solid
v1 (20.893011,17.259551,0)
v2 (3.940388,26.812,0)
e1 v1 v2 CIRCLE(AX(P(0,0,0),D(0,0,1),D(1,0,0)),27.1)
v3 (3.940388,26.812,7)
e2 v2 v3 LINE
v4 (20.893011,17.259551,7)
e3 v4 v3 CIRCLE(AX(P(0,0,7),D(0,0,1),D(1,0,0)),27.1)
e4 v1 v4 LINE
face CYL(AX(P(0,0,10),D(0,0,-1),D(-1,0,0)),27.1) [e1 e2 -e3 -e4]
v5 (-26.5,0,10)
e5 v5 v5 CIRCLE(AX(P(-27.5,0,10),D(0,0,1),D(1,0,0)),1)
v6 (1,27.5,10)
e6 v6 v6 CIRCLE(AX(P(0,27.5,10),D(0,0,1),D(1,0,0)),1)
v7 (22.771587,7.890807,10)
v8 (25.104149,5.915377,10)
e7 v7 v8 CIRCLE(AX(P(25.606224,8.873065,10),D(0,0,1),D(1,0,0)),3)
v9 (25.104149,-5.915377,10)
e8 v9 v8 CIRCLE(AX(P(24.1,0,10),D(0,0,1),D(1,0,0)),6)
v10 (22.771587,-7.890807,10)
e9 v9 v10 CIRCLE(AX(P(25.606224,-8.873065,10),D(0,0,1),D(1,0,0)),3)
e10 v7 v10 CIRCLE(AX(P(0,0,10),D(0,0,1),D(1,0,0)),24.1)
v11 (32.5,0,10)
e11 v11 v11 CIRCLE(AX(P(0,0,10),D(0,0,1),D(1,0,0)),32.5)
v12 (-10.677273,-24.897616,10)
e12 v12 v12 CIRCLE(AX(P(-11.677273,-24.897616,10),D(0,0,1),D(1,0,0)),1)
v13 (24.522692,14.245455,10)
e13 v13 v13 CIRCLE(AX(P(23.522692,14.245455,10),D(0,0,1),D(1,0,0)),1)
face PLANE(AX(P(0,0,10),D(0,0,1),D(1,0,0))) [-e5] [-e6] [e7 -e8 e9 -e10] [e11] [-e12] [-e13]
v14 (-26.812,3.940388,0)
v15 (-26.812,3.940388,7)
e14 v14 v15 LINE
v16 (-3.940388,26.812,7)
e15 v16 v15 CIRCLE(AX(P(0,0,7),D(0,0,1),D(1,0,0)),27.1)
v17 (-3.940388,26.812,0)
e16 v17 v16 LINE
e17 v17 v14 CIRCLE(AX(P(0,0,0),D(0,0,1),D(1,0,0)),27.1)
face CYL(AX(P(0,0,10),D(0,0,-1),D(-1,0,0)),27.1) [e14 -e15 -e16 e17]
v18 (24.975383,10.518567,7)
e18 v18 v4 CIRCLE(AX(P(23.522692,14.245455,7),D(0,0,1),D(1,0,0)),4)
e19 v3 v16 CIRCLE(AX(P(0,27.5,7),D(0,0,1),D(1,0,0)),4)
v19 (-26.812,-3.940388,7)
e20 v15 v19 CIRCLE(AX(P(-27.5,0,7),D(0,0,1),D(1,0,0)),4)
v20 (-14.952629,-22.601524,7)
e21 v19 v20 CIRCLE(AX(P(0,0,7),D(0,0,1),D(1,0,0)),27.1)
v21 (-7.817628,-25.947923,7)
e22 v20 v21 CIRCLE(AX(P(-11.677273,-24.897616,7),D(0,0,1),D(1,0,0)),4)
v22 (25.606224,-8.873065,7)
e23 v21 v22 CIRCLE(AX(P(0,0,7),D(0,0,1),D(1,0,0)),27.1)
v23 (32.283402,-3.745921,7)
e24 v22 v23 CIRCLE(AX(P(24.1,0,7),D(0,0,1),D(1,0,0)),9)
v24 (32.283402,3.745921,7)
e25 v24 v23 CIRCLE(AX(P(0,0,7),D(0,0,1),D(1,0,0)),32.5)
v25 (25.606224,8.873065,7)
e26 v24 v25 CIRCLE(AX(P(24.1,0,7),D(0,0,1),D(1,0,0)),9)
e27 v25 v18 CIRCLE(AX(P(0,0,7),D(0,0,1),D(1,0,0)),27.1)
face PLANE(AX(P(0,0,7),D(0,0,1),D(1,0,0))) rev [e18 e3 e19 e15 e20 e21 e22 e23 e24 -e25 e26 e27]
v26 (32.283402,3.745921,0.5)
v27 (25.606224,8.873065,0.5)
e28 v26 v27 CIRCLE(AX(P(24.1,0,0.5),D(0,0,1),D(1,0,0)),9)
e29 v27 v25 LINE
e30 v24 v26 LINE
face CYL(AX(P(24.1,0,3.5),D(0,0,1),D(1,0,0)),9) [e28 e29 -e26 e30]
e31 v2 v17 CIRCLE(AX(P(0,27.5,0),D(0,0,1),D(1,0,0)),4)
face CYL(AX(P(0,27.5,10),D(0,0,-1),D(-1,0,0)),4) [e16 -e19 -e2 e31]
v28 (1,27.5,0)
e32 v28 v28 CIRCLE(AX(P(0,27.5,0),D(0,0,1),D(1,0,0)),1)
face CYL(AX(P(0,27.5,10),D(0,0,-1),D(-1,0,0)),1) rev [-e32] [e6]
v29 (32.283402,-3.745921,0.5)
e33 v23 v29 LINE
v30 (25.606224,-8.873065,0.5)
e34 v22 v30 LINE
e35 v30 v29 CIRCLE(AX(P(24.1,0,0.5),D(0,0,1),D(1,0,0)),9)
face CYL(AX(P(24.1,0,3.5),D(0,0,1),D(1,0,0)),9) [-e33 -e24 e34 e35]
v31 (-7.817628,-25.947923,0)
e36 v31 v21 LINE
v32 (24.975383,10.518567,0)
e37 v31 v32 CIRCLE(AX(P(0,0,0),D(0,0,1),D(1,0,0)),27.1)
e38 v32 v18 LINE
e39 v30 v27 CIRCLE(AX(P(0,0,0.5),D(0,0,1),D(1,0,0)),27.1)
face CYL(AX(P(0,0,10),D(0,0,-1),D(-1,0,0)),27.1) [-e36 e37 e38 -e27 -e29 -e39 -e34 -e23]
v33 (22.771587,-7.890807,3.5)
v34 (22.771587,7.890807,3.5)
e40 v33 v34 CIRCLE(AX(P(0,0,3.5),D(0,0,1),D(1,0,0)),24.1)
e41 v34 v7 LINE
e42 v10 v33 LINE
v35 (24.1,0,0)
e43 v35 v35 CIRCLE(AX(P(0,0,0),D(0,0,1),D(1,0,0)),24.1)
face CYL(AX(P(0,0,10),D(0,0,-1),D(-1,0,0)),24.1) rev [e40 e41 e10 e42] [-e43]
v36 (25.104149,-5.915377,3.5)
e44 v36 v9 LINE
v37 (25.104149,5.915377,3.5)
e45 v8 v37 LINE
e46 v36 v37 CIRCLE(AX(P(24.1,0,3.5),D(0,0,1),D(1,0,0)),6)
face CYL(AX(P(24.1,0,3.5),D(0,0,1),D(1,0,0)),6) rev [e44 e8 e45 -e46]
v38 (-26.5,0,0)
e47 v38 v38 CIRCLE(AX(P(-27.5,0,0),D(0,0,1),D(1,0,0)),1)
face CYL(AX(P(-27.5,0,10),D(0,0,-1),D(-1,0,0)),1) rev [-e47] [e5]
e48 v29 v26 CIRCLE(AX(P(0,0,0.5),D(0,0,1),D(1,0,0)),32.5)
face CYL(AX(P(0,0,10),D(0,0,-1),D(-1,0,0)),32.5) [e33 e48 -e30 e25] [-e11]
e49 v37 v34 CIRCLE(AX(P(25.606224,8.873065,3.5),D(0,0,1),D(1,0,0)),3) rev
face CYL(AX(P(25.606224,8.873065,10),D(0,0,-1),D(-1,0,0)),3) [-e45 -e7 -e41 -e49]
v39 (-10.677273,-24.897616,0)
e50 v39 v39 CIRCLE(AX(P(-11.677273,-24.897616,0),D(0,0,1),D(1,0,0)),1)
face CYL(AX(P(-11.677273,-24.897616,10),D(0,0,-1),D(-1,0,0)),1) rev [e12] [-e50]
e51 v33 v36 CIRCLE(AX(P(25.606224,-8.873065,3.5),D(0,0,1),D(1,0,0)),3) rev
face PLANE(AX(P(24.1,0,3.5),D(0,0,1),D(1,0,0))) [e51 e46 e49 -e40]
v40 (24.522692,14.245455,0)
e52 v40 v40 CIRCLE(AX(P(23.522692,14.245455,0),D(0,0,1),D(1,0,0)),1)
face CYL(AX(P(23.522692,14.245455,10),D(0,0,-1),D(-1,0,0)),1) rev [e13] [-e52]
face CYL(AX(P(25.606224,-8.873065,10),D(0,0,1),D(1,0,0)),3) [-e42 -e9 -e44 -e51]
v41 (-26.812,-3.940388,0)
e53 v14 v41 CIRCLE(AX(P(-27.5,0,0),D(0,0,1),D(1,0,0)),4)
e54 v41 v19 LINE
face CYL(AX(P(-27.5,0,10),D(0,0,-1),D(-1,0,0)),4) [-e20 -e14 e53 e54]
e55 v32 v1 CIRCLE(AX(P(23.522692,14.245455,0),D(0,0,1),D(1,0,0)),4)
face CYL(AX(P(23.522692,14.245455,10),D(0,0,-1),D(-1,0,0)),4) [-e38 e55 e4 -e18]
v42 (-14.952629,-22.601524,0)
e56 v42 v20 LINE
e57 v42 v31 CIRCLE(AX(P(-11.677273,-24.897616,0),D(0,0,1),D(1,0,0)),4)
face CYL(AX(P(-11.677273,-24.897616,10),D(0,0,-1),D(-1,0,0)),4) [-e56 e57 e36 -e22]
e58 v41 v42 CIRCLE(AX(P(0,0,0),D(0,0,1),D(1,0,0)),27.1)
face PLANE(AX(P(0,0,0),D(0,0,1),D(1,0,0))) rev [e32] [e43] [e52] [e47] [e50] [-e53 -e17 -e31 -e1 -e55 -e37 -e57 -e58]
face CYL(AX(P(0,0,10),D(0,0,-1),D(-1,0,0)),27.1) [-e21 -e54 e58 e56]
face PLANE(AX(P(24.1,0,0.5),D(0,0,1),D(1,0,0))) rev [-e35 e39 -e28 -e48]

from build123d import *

# Parameters (mm, degrees)
SKETCH1_R                = 32.5
SKETCH1_R_2              = 24.1
SKETCH1_R_3              = 1
RING_BODY_DEPTH          = 10
SKETCH2_R                = 6
NUB_CUT_DEPTH            = 6.5
NUB_CUT_FILLETS_3MM_R    = 3
WEIGHT_REDUCTION_DEPTH   = 7
WEIGHT_REDUCTION_2_DEPTH = 0.5


# Read off the part's stored shape, not the designer's step: Weight reduction
with BuildPart() as part:
    # Sketch1 → Ring body (new body)
    with BuildSketch(Plane.XY):
        Circle(SKETCH1_R)
        Circle(SKETCH1_R_2, mode=Mode.SUBTRACT)
        with Locations((0, 27.5)):
            Circle(SKETCH1_R_3, mode=Mode.SUBTRACT)
        with Locations((23.5226917, 14.245454545)):
            Circle(SKETCH1_R_3, mode=Mode.SUBTRACT)
        with Locations((-27.5, 0)):
            Circle(SKETCH1_R_3, mode=Mode.SUBTRACT)
        with Locations((-11.677272727, -24.897616385)):
            Circle(SKETCH1_R_3, mode=Mode.SUBTRACT)
    extrude(amount=RING_BODY_DEPTH)

    # Sketch2 → Nub cut (cut)
    with BuildSketch(Plane.XY.offset(10)):
        with Locations((24.1, 0)):
            Circle(SKETCH2_R)
    extrude(amount=-NUB_CUT_DEPTH, mode=Mode.SUBTRACT)

    # Nub cut fillets 3mm
    nub_cut_fillets_3mm_edges = [part.edges().sort_by_distance(p)[0] for p in [
        (23.353112033, 5.953331703, 6.75),
        (23.353112033, -5.953331703, 6.75),
    ]]
    fillet(nub_cut_fillets_3mm_edges, radius=NUB_CUT_FILLETS_3MM_R)

    # Weight reduction outline → Weight reduction (cut)
    with BuildSketch(Plane.XY):
        with BuildLine():
            ThreePointArc((32.28340249, -3.745920941), (29.581251517, -7.138338869), (25.606224066, -8.87306537))
            ThreePointArc((25.606224066, -8.87306537), (12.328674894, -24.13325041), (-7.817628093, -25.947922672))
            ThreePointArc((-7.817628093, -25.947922672), (-13.375785124, -28.519087859), (-14.952629097, -22.601523911))
            ThreePointArc((-14.952629097, -22.601523911), (-22.872047594, -14.535454545), (-26.812, -3.940387798))
            ThreePointArc((-26.812, -3.940387798), (-31.5, 0), (-26.812, 3.940387798))
            ThreePointArc((-26.812, 3.940387798), (-19.16259377, 19.16259377), (-3.940387798, 26.812))
            ThreePointArc((-3.940387798, 26.812), (0, 31.5), (3.940387798, 26.812))
            ThreePointArc((3.940387798, 26.812), (13.303636364, 23.60981278), (20.893010712, 17.259551077))
            ThreePointArc((20.893010712, 17.259551077), (26.944174129, 16.317520661), (24.975382732, 10.51856727))
            ThreePointArc((24.975382732, 10.51856727), (25.304182573, 9.700945537), (25.606224067, 8.87306537))
            ThreePointArc((25.606224067, 8.87306537), (29.581251517, 7.138338869), (32.28340249, 3.745920941))
            ThreePointArc((32.28340249, 3.745920941), (-32.5, 0), (32.28340249, -3.745920941))
        make_face()
    extrude(amount=WEIGHT_REDUCTION_DEPTH, mode=Mode.SUBTRACT)

    # Weight reduction 2 outline → Weight reduction 2 (cut)
    with BuildSketch(Plane.XY):
        with BuildLine():
            ThreePointArc((25.606224067, 8.87306537), (27.1, 0), (25.606224066, -8.87306537))
            ThreePointArc((25.606224066, -8.87306537), (29.581251517, -7.138338869), (32.28340249, -3.745920941))
            ThreePointArc((32.28340249, -3.745920941), (32.5, 0), (32.28340249, 3.745920941))
            ThreePointArc((32.28340249, 3.745920941), (29.581251517, 7.138338869), (25.606224067, 8.87306537))
        make_face()
    extrude(amount=WEIGHT_REDUCTION_2_DEPTH, mode=Mode.SUBTRACT)


solid = part.part
